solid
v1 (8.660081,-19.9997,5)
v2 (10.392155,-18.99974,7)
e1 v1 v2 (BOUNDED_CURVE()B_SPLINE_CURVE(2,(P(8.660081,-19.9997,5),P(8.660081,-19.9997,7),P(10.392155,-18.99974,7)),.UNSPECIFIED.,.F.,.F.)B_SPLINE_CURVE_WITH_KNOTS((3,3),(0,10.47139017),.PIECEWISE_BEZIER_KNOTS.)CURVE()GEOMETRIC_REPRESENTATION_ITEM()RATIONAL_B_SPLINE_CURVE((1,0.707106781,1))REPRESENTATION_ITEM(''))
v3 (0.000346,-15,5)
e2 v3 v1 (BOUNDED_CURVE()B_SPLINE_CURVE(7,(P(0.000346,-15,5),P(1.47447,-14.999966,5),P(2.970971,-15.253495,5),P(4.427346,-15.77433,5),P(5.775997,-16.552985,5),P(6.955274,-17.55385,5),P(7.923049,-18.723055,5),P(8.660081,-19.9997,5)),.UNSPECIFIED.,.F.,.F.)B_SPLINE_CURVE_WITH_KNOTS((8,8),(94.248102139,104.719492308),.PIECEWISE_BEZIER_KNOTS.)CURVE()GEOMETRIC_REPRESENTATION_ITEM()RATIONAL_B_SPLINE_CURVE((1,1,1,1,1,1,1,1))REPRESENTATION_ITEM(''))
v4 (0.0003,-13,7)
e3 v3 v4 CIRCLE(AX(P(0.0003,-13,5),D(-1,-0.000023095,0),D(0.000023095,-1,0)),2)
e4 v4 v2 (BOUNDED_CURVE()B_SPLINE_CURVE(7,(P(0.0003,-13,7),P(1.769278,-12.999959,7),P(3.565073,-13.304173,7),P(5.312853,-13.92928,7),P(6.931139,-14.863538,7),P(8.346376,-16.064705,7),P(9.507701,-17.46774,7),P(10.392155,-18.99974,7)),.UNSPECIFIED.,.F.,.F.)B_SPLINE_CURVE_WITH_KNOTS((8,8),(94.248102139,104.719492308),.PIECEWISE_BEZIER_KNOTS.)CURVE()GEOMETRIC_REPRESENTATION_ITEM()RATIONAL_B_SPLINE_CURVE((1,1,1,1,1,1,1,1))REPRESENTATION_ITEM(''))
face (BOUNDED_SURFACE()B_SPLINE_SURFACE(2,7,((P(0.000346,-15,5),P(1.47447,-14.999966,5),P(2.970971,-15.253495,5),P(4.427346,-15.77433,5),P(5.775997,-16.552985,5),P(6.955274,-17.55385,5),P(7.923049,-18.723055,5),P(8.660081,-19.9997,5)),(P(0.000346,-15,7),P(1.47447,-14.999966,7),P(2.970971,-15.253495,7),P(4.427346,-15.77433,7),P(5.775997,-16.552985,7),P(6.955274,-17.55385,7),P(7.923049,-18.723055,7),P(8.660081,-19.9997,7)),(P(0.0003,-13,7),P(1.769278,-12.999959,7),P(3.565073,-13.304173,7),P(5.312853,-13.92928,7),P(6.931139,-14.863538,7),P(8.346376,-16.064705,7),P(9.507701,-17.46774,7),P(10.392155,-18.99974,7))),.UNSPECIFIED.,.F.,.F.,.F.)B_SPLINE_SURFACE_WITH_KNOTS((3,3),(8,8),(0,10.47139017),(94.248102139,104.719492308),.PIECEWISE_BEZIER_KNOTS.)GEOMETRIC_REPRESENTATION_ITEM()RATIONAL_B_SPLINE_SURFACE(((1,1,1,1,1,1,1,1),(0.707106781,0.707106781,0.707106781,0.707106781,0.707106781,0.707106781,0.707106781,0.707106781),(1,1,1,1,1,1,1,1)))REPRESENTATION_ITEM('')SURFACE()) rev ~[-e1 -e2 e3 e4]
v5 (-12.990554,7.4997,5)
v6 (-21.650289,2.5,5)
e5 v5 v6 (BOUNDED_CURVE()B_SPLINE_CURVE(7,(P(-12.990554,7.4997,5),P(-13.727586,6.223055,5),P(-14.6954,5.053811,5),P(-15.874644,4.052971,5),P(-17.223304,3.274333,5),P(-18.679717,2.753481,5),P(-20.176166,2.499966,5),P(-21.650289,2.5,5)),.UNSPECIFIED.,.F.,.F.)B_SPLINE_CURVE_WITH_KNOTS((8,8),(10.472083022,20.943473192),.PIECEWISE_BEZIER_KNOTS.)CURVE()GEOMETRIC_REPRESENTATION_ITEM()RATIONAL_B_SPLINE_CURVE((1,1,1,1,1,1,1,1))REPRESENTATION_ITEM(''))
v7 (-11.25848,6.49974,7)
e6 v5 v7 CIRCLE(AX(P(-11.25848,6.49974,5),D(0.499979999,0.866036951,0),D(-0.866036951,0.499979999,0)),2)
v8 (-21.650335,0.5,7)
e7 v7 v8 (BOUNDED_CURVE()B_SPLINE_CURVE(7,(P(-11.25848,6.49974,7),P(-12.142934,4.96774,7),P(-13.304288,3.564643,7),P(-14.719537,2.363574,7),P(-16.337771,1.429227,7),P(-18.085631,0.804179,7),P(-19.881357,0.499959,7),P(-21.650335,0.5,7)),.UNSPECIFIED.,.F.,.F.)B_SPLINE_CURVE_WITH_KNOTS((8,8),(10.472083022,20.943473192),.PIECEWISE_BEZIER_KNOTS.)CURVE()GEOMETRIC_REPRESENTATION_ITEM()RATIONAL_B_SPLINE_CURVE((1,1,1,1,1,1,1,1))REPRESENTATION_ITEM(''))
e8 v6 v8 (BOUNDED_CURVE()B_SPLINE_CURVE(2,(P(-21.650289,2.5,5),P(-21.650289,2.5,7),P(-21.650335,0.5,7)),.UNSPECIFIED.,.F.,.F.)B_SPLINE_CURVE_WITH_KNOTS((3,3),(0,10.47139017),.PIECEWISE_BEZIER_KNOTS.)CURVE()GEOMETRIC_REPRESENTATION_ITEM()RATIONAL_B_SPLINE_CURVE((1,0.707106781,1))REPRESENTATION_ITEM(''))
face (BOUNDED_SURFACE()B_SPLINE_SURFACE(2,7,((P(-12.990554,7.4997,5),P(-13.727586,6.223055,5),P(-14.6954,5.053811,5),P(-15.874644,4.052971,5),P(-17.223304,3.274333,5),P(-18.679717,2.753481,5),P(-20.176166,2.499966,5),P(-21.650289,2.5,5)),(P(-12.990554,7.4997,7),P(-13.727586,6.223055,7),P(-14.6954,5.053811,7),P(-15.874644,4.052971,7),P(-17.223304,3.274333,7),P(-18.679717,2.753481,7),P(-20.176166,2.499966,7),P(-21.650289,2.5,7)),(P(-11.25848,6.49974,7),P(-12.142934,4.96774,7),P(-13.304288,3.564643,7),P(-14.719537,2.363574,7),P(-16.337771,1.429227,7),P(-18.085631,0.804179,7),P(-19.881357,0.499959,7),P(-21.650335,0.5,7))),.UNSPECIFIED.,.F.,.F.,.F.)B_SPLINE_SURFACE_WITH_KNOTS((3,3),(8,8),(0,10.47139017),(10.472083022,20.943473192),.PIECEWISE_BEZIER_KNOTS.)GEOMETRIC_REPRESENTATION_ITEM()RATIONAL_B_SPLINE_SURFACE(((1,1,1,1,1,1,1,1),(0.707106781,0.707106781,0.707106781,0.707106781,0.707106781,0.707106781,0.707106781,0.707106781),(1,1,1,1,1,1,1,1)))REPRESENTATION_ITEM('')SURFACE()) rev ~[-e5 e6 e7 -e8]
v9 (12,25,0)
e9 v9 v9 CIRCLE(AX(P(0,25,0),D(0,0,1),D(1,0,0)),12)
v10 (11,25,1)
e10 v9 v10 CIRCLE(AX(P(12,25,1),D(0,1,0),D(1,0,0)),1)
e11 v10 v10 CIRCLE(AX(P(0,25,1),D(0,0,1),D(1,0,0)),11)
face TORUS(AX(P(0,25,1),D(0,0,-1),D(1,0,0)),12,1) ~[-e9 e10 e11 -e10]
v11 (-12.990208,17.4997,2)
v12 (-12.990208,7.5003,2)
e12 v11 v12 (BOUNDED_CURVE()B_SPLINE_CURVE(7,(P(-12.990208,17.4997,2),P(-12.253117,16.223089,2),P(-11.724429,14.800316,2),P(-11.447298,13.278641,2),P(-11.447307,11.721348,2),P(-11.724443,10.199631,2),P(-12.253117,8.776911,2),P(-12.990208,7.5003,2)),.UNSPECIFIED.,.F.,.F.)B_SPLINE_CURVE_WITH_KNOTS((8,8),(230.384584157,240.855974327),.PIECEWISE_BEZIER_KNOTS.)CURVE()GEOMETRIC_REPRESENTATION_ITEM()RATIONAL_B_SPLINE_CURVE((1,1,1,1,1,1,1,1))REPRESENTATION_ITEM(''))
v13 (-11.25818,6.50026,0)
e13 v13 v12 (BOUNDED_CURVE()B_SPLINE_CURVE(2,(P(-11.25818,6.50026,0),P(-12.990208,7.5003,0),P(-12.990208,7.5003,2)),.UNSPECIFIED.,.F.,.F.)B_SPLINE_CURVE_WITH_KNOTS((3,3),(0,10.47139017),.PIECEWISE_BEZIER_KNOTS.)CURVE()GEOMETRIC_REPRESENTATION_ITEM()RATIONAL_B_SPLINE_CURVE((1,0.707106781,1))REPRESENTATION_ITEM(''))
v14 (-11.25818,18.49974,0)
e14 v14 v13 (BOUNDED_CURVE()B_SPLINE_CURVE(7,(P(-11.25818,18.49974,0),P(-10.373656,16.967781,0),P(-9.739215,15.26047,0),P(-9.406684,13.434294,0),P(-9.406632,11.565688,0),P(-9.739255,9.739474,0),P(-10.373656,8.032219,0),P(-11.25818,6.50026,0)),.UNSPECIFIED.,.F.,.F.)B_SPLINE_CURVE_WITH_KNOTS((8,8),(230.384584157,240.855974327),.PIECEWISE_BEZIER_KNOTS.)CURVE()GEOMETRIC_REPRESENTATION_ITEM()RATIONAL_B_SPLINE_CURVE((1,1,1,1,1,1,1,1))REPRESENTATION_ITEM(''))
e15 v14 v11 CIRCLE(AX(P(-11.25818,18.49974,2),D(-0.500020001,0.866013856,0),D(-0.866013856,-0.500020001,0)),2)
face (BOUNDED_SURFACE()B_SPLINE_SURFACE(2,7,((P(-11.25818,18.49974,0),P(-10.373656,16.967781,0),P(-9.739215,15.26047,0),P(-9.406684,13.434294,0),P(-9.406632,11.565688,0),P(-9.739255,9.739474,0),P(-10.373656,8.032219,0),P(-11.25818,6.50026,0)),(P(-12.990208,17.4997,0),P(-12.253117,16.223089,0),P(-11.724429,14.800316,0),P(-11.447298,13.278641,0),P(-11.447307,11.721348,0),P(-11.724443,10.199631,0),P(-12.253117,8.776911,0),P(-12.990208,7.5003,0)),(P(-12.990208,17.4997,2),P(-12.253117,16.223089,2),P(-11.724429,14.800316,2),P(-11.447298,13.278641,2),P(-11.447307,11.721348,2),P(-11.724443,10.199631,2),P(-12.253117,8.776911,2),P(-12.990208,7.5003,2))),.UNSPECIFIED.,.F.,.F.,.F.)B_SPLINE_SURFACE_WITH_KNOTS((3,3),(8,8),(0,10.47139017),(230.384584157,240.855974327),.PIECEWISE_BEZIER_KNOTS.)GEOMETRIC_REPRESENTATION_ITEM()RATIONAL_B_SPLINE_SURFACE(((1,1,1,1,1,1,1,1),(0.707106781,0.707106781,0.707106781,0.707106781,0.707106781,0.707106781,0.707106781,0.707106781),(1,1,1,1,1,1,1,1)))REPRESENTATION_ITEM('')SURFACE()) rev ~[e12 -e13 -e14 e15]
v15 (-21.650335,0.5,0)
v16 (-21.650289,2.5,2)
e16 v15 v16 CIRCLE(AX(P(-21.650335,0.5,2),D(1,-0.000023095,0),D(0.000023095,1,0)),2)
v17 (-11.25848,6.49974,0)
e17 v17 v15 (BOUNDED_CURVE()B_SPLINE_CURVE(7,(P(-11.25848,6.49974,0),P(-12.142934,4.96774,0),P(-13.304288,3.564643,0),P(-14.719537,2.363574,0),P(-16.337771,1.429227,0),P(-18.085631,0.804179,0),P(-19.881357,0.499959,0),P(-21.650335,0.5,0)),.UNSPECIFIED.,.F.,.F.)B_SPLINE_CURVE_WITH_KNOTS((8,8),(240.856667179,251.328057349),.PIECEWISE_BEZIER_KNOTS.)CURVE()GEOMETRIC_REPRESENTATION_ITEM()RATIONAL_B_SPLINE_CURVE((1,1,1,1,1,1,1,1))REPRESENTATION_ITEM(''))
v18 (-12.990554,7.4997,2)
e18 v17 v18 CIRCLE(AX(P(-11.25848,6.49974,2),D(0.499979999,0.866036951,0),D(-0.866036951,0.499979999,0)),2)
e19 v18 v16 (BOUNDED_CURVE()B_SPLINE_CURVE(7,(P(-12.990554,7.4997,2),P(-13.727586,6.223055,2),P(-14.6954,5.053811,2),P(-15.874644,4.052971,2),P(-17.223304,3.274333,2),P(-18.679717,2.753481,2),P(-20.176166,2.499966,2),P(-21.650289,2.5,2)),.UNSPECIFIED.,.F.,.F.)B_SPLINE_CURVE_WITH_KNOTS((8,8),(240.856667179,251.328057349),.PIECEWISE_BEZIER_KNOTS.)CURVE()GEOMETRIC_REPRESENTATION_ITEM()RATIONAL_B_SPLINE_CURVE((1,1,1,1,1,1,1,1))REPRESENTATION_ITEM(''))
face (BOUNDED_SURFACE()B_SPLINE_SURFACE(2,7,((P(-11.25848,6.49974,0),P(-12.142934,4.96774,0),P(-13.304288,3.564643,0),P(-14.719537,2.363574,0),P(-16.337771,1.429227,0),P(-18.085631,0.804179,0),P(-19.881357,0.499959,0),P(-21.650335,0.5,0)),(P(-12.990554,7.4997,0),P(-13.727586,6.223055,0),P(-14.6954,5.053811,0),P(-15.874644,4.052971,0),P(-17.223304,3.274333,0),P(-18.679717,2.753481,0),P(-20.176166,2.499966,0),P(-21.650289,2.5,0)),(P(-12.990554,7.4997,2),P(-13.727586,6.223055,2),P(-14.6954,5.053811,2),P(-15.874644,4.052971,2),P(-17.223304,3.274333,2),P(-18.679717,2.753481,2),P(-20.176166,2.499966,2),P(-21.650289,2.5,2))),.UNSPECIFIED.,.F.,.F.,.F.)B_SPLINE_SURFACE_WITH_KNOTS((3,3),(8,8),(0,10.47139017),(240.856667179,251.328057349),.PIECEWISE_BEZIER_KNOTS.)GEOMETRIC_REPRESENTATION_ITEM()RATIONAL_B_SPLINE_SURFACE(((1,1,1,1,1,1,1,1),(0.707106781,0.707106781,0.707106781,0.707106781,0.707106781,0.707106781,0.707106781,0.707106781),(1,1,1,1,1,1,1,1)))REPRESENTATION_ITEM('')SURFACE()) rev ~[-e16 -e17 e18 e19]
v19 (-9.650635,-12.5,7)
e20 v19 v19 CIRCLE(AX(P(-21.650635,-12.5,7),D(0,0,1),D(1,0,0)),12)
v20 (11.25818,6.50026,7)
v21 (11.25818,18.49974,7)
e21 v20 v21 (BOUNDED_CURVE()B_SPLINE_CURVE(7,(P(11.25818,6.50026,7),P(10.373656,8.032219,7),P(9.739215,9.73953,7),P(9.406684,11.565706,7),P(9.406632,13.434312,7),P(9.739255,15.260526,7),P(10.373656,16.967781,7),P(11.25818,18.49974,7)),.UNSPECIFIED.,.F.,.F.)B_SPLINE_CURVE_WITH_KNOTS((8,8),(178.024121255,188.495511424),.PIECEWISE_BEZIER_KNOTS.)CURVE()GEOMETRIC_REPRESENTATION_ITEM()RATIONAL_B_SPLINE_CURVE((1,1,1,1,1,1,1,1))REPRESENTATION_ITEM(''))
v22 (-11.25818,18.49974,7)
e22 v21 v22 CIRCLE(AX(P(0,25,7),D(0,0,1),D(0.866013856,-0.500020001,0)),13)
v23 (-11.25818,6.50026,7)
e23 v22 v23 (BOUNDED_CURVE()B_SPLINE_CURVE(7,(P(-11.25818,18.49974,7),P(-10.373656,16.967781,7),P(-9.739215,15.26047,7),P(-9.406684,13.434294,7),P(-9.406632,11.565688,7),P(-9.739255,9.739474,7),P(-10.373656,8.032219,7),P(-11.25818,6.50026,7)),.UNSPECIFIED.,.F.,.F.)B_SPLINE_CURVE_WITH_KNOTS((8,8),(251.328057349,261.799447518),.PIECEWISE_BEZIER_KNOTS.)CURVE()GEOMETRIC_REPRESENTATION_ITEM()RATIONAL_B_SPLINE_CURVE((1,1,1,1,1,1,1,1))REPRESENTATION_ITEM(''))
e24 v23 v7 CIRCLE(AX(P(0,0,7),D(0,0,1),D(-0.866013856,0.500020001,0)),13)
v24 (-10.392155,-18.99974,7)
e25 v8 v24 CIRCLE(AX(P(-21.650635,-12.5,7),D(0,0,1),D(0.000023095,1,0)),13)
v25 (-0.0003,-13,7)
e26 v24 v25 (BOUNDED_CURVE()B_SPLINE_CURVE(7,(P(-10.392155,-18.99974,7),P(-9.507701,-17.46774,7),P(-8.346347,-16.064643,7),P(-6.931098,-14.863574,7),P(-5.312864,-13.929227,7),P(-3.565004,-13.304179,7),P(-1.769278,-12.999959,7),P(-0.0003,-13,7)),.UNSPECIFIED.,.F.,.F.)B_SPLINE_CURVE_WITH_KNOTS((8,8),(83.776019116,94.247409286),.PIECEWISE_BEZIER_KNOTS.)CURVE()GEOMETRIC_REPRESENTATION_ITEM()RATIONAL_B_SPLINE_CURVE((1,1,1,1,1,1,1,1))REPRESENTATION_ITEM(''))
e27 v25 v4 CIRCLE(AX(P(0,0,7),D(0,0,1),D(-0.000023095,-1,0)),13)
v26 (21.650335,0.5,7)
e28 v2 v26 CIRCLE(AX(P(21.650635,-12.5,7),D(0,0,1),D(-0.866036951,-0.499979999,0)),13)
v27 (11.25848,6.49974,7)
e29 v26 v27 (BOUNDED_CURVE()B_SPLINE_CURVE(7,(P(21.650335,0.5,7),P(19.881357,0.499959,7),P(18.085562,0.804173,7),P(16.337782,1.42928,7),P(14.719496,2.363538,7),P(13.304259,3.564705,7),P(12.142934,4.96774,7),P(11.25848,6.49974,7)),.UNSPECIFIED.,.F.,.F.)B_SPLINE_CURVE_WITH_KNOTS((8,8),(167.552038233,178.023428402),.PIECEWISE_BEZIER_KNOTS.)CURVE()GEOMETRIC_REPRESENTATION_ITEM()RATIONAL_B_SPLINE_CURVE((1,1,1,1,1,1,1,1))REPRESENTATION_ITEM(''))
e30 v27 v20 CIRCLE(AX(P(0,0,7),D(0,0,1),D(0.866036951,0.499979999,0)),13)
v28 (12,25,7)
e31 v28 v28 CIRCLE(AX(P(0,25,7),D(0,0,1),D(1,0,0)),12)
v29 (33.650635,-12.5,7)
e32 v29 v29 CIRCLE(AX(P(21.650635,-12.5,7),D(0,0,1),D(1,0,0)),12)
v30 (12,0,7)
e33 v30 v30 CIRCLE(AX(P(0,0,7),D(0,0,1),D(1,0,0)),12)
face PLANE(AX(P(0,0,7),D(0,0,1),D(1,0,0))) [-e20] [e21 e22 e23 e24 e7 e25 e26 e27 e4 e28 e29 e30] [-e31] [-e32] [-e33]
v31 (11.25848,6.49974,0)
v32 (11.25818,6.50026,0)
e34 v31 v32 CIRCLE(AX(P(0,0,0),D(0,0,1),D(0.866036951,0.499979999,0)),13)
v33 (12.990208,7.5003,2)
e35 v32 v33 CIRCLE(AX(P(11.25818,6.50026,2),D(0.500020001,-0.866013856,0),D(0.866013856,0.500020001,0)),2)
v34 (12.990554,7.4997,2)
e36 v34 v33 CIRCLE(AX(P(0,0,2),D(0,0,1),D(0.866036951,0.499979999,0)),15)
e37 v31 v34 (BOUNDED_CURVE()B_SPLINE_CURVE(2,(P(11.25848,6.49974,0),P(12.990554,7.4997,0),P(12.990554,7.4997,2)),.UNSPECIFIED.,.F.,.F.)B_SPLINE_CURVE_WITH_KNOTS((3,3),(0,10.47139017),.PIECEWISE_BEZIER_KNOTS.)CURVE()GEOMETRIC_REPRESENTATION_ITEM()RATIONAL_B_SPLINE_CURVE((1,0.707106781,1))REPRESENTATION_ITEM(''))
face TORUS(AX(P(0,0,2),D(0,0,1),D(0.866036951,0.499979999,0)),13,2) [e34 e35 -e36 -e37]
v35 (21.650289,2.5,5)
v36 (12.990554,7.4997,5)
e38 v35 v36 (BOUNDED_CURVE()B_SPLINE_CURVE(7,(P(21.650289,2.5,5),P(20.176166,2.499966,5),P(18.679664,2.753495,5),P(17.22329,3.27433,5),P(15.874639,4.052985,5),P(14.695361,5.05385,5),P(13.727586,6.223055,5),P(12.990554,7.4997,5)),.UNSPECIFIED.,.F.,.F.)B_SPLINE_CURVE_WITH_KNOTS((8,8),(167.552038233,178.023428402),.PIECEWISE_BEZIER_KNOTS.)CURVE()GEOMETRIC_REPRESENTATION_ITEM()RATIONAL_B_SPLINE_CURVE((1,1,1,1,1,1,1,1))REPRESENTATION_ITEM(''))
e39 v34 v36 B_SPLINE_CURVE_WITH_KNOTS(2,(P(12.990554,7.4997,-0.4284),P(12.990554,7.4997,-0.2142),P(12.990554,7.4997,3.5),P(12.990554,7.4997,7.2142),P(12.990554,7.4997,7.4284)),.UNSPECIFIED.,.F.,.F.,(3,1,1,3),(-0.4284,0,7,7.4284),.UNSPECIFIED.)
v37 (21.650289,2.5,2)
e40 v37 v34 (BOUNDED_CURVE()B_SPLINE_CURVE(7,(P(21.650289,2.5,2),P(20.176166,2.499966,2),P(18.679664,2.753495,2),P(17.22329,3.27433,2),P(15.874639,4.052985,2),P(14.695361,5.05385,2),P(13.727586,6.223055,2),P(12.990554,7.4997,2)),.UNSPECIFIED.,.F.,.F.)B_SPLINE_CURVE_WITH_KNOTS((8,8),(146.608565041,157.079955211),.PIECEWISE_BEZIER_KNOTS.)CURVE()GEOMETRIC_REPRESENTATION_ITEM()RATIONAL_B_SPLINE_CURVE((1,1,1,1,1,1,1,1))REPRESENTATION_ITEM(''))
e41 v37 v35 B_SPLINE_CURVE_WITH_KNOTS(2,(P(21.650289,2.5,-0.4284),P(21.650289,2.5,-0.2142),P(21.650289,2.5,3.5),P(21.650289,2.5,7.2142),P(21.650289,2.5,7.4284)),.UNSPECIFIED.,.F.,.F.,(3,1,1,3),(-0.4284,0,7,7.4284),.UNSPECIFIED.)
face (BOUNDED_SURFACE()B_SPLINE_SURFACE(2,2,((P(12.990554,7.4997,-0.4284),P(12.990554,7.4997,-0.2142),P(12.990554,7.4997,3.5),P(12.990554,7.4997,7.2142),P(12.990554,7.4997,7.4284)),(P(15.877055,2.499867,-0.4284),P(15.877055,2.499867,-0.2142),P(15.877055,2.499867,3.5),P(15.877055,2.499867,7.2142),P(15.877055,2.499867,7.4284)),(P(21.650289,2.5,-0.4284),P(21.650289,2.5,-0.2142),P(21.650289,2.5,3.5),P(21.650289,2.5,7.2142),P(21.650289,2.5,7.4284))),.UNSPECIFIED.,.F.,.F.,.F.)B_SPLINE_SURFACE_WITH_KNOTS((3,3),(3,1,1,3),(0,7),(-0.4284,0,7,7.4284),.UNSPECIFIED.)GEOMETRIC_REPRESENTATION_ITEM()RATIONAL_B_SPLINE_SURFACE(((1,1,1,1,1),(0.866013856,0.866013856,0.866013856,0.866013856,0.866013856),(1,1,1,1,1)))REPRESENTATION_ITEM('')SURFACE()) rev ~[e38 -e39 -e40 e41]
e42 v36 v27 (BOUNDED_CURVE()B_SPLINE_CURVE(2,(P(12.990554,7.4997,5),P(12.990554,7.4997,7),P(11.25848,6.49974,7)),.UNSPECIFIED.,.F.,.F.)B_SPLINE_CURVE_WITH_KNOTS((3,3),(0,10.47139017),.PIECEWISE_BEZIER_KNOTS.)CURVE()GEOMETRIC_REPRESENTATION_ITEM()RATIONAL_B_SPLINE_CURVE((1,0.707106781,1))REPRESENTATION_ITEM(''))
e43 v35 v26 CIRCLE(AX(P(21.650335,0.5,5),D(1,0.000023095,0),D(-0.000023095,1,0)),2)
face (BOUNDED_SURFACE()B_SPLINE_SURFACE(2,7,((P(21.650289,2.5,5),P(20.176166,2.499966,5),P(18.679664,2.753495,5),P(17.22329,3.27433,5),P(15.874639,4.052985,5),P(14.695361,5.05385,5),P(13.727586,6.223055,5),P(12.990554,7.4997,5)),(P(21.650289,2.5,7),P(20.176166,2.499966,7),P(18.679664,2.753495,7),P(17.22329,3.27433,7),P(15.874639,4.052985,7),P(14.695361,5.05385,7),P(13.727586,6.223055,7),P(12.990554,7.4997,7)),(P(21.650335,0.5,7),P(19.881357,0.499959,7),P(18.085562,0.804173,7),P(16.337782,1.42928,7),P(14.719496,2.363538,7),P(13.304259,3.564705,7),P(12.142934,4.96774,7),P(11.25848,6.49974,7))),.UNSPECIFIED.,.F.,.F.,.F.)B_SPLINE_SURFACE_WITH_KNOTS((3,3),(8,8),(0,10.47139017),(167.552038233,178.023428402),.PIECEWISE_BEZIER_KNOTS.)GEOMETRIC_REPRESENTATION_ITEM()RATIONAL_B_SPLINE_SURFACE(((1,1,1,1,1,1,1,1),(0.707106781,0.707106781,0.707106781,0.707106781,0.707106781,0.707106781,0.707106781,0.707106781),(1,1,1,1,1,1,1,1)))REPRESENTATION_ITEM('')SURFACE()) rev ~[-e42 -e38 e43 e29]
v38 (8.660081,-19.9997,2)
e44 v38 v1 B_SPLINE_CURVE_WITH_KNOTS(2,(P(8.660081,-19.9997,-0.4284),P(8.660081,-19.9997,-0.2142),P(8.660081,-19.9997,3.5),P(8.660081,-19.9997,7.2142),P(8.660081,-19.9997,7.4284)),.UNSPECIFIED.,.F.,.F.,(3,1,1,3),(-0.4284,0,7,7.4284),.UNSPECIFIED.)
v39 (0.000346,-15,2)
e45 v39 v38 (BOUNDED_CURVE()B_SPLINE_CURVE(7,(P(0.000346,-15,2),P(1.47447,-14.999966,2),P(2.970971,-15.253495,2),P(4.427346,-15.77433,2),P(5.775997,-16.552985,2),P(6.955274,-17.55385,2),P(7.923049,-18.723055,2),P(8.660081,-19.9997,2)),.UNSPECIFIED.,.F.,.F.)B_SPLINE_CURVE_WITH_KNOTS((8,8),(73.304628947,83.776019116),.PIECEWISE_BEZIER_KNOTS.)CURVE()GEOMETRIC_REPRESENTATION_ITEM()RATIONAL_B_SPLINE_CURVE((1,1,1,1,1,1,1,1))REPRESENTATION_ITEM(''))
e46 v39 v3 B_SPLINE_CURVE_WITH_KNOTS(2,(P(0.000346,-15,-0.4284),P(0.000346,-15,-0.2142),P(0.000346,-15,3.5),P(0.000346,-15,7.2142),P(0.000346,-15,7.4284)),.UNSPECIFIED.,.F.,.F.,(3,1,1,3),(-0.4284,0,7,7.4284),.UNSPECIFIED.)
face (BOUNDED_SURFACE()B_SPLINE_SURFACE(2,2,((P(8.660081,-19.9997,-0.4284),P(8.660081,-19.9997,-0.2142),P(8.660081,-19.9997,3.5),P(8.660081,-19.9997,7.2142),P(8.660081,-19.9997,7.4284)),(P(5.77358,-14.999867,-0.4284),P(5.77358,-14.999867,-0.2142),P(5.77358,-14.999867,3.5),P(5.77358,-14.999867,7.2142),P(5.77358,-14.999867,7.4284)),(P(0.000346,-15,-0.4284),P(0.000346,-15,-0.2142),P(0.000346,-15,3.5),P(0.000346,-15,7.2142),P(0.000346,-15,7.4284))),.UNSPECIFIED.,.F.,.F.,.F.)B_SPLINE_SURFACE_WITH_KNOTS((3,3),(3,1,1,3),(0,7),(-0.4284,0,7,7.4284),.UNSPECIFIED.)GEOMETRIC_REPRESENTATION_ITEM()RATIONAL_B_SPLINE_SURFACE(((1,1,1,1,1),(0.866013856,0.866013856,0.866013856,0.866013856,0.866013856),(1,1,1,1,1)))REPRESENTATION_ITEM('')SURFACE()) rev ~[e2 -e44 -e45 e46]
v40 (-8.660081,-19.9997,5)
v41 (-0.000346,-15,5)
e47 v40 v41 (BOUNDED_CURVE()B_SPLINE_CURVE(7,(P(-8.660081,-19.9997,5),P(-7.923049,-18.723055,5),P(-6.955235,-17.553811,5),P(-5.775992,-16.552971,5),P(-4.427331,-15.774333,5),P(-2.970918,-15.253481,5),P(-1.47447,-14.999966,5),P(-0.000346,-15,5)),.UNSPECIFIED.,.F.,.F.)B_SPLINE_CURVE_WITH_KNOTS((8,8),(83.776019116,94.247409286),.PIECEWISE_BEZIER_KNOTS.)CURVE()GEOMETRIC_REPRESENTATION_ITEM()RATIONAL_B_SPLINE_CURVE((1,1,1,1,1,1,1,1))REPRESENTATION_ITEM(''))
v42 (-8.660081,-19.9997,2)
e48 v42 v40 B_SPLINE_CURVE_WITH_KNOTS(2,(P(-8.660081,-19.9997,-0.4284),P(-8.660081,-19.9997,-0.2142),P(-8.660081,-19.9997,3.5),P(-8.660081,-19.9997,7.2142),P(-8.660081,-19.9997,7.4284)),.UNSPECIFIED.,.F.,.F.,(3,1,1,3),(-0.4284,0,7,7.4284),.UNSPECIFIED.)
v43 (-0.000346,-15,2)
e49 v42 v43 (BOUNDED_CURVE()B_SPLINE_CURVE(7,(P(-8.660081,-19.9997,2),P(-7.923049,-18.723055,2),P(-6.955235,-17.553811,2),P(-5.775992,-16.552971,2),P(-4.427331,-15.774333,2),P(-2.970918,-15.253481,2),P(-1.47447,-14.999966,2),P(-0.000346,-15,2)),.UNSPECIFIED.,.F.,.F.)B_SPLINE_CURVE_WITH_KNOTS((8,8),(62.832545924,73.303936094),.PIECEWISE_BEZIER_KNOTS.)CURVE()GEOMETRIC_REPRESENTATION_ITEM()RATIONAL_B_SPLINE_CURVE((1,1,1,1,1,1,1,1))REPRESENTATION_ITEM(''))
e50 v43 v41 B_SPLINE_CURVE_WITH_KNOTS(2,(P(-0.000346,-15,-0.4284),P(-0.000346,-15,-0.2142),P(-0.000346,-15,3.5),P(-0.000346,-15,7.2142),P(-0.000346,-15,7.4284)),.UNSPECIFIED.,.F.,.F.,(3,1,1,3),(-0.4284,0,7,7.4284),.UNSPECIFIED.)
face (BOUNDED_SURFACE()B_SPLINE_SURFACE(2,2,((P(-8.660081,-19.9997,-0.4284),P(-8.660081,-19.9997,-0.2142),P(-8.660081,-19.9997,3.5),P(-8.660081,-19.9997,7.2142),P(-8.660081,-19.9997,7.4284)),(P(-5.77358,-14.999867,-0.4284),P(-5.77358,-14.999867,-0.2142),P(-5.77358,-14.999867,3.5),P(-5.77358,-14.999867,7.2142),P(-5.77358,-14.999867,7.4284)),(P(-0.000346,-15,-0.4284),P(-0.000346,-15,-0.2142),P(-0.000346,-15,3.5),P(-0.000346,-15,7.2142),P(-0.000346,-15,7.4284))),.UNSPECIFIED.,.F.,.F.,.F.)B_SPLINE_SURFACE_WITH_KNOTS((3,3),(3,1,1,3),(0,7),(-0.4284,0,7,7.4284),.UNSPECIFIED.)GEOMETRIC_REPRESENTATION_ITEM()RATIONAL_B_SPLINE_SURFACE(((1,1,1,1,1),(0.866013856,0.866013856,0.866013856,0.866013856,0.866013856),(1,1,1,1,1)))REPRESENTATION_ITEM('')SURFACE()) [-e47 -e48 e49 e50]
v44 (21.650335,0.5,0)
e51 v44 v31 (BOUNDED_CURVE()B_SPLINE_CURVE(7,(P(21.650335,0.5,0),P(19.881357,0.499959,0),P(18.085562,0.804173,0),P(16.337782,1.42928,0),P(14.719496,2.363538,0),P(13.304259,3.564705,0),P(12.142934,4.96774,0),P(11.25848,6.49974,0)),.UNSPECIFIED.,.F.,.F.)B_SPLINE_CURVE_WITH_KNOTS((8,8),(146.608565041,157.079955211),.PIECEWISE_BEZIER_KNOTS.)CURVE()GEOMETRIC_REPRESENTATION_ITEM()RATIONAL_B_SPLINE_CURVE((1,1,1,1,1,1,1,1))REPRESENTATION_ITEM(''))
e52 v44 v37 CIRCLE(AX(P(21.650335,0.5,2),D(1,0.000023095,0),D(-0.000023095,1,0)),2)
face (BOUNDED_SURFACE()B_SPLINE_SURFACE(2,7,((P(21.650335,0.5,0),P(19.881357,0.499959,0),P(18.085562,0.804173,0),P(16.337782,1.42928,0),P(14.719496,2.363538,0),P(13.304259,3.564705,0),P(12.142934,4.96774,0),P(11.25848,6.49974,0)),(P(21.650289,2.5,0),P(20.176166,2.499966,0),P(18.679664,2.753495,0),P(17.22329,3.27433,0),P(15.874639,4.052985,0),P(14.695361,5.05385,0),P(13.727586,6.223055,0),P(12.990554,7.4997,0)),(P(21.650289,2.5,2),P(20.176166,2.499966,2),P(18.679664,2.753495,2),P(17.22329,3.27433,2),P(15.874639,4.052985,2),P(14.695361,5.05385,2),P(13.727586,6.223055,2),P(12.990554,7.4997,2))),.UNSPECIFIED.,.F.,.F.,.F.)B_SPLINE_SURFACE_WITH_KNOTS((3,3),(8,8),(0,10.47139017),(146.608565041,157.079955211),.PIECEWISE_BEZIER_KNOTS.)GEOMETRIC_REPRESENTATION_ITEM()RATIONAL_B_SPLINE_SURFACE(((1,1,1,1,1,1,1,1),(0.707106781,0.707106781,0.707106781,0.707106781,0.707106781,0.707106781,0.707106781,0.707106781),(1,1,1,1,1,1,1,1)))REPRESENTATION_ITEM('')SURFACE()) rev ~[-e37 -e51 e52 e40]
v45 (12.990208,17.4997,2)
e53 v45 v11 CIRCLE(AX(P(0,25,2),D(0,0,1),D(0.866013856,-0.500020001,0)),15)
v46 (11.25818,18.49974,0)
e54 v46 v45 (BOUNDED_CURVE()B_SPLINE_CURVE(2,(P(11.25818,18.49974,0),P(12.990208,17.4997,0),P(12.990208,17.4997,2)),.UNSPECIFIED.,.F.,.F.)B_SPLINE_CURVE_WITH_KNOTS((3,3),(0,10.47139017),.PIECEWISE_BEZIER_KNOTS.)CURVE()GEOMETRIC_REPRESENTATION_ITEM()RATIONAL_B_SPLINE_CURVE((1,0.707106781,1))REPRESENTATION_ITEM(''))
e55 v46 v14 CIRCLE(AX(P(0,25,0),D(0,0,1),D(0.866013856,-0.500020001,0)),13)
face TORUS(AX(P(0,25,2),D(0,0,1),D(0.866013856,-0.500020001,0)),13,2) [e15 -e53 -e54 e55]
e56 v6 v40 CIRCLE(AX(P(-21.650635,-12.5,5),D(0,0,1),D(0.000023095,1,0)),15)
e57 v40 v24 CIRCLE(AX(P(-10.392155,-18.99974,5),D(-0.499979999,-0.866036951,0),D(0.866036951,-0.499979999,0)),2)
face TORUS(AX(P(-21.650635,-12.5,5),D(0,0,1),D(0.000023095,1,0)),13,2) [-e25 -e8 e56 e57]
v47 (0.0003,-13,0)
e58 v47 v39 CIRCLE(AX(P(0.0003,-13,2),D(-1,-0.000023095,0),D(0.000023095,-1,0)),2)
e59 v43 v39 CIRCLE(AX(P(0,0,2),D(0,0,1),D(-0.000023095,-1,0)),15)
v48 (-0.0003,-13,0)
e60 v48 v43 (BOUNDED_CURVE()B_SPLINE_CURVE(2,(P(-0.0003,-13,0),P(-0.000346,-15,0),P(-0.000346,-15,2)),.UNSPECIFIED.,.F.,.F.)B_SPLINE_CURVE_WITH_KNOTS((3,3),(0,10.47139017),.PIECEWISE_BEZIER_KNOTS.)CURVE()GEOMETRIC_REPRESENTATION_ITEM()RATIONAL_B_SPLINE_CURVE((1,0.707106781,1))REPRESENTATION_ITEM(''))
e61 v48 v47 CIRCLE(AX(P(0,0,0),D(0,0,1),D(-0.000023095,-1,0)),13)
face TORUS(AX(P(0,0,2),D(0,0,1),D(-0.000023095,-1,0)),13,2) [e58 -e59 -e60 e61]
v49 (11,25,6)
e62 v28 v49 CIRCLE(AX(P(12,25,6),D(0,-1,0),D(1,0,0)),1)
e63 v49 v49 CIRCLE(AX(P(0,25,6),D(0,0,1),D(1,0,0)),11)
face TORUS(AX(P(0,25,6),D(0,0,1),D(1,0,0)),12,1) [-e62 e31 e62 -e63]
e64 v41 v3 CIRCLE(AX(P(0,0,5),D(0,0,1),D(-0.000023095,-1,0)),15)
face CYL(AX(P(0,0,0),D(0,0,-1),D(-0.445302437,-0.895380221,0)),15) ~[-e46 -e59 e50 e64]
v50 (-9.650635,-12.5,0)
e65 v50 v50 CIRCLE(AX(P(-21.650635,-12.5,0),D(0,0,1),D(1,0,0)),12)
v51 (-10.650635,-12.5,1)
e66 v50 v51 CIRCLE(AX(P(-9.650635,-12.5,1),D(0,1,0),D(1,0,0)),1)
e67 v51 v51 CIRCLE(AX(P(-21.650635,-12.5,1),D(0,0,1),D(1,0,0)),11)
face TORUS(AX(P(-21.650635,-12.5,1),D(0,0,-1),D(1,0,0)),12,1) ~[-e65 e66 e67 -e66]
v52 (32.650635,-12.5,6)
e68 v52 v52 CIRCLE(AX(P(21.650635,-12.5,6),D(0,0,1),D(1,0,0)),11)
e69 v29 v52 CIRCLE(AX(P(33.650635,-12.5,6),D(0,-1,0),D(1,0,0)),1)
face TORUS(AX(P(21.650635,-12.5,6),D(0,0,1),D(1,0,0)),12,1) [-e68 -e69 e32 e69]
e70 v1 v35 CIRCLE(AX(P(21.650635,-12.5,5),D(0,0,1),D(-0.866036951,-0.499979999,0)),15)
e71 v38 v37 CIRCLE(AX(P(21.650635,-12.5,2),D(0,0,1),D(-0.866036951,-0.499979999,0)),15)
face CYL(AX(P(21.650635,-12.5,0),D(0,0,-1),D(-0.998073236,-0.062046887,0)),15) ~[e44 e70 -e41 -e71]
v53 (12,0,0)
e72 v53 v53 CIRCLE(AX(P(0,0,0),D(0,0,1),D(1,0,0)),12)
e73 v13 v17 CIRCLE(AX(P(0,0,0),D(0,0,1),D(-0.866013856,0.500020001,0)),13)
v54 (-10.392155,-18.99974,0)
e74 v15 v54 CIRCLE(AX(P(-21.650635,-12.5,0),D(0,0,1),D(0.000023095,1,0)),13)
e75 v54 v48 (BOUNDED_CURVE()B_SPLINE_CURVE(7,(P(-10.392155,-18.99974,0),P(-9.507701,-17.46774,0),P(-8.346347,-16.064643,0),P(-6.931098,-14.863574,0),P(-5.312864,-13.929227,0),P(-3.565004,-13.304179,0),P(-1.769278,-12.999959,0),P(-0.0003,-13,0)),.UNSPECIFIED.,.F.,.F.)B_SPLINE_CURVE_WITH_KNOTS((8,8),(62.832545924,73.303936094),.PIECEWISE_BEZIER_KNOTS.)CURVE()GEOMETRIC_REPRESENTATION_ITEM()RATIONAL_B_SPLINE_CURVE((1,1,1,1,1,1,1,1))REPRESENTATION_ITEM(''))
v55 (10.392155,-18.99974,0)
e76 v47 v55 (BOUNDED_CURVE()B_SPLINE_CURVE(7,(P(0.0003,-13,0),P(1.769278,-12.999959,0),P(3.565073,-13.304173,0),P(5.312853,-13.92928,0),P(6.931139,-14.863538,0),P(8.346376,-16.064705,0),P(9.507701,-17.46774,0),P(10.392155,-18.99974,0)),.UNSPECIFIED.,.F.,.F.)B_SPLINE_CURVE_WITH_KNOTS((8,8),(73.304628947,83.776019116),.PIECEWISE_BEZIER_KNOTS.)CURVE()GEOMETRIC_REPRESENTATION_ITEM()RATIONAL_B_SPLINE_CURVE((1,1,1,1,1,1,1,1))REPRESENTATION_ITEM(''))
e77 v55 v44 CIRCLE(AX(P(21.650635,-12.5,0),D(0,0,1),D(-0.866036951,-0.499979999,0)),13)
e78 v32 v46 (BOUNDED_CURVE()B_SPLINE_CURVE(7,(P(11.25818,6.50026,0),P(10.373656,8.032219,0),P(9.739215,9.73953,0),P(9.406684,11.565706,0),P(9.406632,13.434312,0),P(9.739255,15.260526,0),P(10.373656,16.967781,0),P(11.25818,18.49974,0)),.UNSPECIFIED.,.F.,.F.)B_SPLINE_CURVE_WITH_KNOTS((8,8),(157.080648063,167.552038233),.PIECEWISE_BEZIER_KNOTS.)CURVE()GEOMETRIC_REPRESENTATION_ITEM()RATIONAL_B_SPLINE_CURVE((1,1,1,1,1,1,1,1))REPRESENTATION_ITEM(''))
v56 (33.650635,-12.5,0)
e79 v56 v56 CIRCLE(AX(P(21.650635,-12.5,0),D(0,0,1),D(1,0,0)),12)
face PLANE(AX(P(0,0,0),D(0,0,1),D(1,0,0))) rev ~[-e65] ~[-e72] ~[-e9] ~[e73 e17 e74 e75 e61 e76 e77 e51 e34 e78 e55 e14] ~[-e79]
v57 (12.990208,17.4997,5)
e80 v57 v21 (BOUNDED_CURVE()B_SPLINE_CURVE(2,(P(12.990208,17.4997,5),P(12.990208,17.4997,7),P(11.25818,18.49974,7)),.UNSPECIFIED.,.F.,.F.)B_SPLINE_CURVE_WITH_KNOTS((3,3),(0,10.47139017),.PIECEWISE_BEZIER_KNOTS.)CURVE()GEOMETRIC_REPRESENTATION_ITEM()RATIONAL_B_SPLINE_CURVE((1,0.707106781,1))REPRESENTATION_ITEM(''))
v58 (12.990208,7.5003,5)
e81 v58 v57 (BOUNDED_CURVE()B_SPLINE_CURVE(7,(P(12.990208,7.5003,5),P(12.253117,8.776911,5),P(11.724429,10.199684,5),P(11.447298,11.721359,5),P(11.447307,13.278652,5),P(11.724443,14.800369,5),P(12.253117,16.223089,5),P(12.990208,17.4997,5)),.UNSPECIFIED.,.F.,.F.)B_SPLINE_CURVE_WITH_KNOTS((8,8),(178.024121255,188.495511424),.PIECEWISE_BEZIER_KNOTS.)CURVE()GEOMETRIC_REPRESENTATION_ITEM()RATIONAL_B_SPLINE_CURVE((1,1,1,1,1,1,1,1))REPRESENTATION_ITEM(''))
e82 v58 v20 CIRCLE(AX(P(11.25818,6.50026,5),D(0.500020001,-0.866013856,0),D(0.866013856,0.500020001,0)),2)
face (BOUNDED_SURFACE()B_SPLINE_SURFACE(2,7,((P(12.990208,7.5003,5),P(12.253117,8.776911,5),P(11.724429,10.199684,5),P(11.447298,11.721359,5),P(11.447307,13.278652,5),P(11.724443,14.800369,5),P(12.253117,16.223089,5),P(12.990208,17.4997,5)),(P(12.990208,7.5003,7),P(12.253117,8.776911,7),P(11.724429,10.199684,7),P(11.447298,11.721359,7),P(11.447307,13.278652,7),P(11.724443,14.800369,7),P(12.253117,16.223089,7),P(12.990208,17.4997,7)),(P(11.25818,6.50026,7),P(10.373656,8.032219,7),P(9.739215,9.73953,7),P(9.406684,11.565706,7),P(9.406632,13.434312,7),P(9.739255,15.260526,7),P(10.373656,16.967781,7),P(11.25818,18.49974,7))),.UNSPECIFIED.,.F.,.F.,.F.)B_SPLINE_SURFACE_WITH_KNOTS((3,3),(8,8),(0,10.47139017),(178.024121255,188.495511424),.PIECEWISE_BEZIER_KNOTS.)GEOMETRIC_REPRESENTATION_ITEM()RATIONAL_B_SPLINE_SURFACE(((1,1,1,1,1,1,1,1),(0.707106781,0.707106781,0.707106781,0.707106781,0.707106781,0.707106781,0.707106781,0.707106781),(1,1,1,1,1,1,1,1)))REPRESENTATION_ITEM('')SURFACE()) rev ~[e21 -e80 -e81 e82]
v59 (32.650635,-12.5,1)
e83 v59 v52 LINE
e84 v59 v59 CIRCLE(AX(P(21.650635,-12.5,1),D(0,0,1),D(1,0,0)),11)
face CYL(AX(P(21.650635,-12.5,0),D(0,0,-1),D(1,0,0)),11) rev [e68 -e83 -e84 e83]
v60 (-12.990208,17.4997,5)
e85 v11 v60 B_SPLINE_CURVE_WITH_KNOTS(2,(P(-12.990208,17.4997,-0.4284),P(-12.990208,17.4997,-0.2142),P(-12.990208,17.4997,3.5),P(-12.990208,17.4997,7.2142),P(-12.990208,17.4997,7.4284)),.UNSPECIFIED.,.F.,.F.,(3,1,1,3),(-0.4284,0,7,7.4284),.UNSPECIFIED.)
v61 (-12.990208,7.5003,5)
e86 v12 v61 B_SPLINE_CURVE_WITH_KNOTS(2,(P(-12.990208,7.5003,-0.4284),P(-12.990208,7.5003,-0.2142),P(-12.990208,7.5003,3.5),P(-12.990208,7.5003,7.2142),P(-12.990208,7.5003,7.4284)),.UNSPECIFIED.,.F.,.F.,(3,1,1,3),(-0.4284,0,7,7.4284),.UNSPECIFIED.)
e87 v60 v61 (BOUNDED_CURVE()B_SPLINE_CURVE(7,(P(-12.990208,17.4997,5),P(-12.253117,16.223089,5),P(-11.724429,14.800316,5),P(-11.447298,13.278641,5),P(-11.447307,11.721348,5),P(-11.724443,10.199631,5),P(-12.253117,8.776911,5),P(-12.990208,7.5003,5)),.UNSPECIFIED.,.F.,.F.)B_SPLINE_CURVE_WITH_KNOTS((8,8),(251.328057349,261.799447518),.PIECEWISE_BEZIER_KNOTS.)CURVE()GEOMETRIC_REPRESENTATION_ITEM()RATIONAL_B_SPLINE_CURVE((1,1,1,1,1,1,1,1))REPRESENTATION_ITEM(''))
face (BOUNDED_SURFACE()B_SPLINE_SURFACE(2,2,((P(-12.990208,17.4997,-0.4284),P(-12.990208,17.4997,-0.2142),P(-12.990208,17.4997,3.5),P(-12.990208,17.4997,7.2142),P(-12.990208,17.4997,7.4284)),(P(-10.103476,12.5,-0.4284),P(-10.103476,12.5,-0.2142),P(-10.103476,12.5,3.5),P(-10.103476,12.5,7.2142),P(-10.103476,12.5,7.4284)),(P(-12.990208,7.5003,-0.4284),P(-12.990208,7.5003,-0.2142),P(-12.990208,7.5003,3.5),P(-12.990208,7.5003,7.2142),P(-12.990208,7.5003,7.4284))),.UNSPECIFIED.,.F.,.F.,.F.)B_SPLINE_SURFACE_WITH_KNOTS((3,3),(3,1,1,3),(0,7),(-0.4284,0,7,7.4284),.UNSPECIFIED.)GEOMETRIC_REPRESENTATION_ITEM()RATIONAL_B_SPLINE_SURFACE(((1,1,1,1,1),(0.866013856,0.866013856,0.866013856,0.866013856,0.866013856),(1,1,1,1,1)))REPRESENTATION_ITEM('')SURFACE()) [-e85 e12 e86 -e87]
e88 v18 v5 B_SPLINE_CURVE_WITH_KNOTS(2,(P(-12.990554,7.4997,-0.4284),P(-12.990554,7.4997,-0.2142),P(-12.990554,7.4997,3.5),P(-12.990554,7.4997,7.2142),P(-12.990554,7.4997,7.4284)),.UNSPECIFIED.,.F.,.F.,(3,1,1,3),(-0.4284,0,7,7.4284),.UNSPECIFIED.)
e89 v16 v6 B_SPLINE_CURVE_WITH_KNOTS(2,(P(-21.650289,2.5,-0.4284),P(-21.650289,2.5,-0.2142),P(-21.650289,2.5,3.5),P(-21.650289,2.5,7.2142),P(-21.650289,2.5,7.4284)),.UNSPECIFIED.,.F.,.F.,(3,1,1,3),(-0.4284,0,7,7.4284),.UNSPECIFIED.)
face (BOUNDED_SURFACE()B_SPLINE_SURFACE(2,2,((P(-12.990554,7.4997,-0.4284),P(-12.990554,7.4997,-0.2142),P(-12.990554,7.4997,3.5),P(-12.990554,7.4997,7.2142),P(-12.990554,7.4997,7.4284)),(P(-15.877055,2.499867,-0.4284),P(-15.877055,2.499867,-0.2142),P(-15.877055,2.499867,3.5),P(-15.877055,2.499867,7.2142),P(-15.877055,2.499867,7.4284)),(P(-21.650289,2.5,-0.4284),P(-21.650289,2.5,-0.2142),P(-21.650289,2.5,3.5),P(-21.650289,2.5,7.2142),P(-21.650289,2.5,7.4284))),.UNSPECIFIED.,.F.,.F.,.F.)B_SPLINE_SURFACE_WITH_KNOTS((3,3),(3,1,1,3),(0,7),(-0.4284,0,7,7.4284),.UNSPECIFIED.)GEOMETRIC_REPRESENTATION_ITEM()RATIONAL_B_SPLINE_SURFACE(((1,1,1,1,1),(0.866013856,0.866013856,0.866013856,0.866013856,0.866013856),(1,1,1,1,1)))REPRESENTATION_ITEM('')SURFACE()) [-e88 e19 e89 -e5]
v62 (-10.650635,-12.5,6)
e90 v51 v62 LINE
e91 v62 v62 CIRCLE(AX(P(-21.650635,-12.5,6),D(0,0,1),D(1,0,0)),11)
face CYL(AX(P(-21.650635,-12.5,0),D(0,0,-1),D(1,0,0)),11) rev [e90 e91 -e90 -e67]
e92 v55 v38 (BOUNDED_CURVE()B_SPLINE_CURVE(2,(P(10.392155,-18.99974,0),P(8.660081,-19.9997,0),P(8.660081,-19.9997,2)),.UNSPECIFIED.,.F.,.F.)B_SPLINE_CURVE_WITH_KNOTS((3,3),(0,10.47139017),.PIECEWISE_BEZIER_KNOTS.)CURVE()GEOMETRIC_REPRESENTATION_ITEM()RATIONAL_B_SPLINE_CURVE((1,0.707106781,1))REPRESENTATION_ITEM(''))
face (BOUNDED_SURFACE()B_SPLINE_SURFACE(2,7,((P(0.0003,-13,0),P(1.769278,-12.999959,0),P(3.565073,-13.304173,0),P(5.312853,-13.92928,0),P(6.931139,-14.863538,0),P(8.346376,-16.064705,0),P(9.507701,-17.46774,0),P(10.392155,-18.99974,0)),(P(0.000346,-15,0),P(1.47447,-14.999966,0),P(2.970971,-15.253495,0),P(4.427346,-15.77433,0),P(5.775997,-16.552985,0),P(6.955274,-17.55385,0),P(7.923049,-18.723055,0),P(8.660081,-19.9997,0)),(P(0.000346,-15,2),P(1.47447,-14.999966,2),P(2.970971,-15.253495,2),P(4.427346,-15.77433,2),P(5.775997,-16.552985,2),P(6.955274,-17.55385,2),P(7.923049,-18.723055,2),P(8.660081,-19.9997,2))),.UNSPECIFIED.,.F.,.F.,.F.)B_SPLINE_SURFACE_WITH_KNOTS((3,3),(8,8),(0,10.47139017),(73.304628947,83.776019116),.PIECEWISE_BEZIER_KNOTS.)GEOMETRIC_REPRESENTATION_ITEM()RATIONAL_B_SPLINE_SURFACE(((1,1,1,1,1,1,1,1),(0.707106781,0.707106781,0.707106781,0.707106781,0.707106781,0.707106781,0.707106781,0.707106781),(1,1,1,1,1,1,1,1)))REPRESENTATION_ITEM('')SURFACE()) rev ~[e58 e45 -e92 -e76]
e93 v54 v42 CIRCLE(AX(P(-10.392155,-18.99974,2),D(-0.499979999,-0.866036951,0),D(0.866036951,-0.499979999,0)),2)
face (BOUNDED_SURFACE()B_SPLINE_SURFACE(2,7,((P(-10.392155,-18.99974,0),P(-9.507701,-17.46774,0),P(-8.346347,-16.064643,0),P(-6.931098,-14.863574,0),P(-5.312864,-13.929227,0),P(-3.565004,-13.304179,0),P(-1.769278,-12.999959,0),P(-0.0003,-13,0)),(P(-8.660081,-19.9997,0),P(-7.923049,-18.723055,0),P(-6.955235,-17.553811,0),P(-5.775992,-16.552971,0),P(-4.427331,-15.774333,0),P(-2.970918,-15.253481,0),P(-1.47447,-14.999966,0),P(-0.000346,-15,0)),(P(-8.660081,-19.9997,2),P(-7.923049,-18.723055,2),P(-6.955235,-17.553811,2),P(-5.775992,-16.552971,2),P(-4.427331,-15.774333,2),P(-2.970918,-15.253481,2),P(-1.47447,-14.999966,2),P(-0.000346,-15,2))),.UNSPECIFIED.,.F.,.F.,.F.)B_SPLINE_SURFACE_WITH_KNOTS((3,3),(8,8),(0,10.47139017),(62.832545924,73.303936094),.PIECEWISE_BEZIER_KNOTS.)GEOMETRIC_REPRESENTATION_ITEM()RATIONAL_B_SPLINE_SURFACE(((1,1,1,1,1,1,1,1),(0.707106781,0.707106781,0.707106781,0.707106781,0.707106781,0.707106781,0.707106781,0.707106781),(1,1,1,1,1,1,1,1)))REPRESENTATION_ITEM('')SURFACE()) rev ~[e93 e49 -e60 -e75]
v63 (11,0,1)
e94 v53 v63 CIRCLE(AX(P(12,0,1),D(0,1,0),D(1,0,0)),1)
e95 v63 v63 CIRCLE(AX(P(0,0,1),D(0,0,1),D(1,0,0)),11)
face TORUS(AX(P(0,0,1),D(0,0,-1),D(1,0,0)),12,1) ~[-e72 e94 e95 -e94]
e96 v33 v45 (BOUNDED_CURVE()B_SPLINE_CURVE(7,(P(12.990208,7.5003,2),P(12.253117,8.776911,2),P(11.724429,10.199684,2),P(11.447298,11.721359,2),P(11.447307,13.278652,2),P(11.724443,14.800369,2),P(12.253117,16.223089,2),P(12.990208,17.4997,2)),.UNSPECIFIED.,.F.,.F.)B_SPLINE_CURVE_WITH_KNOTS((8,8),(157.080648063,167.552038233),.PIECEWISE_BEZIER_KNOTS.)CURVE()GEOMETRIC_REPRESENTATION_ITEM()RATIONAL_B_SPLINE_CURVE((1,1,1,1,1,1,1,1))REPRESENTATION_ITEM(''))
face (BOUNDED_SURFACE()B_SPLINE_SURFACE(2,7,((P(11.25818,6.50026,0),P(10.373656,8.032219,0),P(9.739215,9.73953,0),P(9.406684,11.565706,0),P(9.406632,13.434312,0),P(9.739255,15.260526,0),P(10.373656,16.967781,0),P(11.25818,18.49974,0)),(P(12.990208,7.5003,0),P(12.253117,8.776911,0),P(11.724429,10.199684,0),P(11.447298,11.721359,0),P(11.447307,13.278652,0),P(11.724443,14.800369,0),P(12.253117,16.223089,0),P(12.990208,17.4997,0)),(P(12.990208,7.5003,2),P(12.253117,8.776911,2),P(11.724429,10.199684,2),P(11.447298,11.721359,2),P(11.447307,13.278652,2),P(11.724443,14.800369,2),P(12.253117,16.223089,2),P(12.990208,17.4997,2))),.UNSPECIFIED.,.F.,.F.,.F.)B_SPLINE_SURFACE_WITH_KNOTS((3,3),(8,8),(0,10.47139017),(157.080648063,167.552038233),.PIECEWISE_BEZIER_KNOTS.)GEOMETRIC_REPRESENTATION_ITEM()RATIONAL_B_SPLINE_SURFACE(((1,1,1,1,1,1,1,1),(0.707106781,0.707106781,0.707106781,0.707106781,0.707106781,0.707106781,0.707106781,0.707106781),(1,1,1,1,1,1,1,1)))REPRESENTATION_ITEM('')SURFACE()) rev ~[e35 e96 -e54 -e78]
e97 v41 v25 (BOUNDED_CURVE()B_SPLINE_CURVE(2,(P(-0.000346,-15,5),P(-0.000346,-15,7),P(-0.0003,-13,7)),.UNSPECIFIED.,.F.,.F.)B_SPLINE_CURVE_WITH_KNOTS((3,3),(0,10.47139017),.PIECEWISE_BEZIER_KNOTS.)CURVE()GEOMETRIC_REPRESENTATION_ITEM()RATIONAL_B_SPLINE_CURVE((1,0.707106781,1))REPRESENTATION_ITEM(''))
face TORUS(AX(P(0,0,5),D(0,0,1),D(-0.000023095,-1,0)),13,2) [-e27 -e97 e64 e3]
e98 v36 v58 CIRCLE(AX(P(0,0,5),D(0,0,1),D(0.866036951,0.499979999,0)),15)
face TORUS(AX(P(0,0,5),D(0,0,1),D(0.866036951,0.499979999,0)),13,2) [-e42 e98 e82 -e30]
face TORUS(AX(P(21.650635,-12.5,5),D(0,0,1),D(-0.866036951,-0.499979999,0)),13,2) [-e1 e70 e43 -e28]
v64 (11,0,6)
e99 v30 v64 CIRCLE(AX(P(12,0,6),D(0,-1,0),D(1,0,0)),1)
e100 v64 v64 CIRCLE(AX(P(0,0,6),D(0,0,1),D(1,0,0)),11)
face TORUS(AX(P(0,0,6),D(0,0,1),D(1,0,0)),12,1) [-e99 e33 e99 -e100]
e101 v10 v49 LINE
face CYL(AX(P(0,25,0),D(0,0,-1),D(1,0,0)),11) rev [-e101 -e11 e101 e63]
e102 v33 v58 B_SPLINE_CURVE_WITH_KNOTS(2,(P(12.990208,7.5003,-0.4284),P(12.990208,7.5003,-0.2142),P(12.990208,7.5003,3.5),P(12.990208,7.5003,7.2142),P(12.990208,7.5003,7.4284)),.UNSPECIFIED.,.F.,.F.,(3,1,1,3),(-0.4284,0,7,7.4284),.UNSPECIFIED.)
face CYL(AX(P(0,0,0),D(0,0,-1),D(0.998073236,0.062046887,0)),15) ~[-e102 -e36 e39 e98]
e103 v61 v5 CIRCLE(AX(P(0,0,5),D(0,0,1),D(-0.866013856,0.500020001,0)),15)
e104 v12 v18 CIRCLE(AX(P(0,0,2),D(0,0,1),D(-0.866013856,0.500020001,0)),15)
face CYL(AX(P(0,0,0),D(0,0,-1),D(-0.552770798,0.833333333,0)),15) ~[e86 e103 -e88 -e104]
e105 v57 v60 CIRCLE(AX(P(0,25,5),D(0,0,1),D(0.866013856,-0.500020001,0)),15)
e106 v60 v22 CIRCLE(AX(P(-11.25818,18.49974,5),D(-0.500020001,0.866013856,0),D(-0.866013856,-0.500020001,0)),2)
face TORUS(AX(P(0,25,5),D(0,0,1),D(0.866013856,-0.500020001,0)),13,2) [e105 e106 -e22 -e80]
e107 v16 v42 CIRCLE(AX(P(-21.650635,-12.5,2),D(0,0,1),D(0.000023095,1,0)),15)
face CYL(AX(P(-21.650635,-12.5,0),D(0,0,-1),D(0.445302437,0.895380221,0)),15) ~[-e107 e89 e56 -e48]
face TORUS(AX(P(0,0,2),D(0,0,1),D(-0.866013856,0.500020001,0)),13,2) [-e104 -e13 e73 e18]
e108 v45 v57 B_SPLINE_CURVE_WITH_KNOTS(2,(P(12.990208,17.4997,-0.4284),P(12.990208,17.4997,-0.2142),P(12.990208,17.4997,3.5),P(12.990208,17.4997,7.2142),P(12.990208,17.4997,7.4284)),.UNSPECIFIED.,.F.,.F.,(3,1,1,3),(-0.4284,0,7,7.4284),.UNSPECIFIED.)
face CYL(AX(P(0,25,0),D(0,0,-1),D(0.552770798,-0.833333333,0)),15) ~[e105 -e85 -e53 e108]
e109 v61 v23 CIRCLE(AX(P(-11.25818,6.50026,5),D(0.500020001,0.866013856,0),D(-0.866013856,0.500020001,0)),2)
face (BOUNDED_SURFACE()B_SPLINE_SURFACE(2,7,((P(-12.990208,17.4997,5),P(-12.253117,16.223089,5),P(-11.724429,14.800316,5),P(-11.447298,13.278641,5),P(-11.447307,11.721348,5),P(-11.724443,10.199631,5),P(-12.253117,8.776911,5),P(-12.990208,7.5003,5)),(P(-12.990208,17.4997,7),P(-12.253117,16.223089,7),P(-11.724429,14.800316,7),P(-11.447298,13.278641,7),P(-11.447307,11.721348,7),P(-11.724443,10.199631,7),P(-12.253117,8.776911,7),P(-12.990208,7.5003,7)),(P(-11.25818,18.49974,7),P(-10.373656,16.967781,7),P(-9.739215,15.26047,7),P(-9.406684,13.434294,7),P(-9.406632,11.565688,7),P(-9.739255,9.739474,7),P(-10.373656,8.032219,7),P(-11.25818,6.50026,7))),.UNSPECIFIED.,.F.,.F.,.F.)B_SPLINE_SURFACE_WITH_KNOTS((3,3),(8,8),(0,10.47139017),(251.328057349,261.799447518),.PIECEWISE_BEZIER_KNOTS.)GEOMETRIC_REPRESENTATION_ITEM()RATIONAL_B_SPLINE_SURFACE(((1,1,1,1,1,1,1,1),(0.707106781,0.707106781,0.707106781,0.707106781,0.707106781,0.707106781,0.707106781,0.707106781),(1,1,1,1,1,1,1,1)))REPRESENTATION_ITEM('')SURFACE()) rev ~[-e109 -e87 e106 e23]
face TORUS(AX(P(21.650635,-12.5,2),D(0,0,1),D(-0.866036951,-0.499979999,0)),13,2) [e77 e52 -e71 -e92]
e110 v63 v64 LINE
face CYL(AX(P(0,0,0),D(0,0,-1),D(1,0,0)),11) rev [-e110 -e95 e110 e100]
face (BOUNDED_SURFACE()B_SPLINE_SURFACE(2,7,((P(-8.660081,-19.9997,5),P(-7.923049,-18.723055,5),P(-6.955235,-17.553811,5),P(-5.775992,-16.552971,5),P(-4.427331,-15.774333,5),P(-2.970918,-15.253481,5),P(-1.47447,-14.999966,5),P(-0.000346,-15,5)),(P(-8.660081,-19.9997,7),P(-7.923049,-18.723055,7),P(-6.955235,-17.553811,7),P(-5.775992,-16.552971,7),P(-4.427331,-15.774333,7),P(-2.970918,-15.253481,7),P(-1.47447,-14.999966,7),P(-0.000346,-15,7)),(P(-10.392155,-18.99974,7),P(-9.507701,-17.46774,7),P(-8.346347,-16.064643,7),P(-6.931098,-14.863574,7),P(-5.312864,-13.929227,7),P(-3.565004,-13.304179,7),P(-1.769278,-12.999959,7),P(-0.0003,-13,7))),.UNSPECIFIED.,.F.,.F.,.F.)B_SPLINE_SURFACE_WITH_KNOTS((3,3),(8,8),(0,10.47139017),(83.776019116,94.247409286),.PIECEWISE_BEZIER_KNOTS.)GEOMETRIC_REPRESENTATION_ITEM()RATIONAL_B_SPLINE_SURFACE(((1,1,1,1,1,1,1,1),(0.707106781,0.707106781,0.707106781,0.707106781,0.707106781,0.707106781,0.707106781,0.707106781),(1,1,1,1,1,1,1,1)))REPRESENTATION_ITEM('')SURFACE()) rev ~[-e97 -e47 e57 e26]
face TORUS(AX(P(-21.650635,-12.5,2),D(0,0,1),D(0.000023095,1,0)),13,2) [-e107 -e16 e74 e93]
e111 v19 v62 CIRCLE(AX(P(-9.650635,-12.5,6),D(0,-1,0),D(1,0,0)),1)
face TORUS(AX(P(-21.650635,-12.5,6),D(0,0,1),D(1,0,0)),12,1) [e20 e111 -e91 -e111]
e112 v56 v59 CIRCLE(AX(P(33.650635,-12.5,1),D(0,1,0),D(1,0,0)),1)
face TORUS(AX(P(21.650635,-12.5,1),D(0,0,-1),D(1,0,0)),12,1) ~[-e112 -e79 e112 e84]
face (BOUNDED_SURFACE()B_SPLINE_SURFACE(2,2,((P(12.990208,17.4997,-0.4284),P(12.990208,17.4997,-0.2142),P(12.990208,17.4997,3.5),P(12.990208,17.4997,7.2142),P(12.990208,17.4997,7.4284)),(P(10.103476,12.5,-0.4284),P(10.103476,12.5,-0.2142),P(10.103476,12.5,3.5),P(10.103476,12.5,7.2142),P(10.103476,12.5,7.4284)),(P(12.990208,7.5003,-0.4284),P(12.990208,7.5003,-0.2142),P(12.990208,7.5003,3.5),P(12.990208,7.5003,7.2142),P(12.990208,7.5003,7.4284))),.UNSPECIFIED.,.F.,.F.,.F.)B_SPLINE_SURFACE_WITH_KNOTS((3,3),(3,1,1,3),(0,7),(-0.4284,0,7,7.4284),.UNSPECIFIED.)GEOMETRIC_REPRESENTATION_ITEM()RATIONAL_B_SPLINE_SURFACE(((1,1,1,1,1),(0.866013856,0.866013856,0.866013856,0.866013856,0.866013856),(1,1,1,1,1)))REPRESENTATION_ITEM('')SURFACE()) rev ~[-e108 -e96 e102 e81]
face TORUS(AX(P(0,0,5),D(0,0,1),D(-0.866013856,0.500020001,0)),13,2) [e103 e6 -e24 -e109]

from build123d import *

# Parameters (mm, degrees)
F0_R     = 11
F1_DEPTH = 7
F2_R     = 9.999
F3_R     = 2
F4_R     = 1


# Not quite as in the source:
# - a fillet or chamfer is up to 0.001 mm smaller than in the source, because OpenCascade refuses the exact size


with BuildPart() as f1:
    # F0 (on Top) → F1 (new body)
    with BuildSketch(Plane.XY):
        with BuildLine():
            ThreePointArc((8.2915619759, 12.5), (0, 40), (-8.2915619759, 12.5))
            ThreePointArc((-8.2915619759, 12.5), (-12.9903810568, 7.5), (-14.9710985352, 0.9307033082))
            ThreePointArc((-14.9710985352, 0.9307033082), (-34.6410161514, -20), (-6.6795365594, -13.4307033082))
            ThreePointArc((-6.6795365594, -13.4307033082), (0, -15), (6.6795365594, -13.4307033082))
            ThreePointArc((6.6795365594, -13.4307033082), (34.6410161514, -20), (14.9710985352, 0.9307033082))
            ThreePointArc((14.9710985352, 0.9307033082), (12.9903810568, 7.5), (8.2915619759, 12.5))
        make_face()
        with Locations((-21.6506350946, -12.5)):
            Circle(F0_R, mode=Mode.SUBTRACT)
        Circle(F0_R, mode=Mode.SUBTRACT)
        with Locations((21.6506350946, -12.5)):
            Circle(F0_R, mode=Mode.SUBTRACT)
        with Locations((0, 25)):
            Circle(F0_R, mode=Mode.SUBTRACT)
    extrude(amount=F1_DEPTH)

    # F2 (radius 10 in the source; OpenCascade refuses exactly that, so slightly less here)
    f2_edges = [f1.edges().sort_by_distance(p)[0] for p in [
        (8.291562, 12.5, 3.5),
        (14.971099, 0.930703, 3.5),
        (-6.679537, -13.430703, 3.5),
        (6.679537, -13.430703, 3.5),
        (-8.291562, 12.5, 3.5),
        (-14.971099, 0.930703, 3.5),
    ]]
    fillet(f2_edges, radius=F2_R)

    # F3
    f3_edges = [f1.edges().sort_by_distance(p)[0] for p in [
        (-34.641016, -20, 0),
        (-11.65048, 12.5, 7),
    ]]
    fillet(f3_edges, radius=F3_R)

    # F4
    f4_edges = [f1.edges().sort_by_distance(p)[0] for p in [
        (10.650635, -12.5, 7),
        (-11, 0, 7),
        (-32.650635, -12.5, 7),
        (-11, 25, 7),
        (-32.650635, -12.5, 0),
        (10.650635, -12.5, 0),
        (-11, 0, 0),
        (-11, 25, 0),
    ]]
    fillet(f4_edges, radius=F4_R)


solid = f1.part
